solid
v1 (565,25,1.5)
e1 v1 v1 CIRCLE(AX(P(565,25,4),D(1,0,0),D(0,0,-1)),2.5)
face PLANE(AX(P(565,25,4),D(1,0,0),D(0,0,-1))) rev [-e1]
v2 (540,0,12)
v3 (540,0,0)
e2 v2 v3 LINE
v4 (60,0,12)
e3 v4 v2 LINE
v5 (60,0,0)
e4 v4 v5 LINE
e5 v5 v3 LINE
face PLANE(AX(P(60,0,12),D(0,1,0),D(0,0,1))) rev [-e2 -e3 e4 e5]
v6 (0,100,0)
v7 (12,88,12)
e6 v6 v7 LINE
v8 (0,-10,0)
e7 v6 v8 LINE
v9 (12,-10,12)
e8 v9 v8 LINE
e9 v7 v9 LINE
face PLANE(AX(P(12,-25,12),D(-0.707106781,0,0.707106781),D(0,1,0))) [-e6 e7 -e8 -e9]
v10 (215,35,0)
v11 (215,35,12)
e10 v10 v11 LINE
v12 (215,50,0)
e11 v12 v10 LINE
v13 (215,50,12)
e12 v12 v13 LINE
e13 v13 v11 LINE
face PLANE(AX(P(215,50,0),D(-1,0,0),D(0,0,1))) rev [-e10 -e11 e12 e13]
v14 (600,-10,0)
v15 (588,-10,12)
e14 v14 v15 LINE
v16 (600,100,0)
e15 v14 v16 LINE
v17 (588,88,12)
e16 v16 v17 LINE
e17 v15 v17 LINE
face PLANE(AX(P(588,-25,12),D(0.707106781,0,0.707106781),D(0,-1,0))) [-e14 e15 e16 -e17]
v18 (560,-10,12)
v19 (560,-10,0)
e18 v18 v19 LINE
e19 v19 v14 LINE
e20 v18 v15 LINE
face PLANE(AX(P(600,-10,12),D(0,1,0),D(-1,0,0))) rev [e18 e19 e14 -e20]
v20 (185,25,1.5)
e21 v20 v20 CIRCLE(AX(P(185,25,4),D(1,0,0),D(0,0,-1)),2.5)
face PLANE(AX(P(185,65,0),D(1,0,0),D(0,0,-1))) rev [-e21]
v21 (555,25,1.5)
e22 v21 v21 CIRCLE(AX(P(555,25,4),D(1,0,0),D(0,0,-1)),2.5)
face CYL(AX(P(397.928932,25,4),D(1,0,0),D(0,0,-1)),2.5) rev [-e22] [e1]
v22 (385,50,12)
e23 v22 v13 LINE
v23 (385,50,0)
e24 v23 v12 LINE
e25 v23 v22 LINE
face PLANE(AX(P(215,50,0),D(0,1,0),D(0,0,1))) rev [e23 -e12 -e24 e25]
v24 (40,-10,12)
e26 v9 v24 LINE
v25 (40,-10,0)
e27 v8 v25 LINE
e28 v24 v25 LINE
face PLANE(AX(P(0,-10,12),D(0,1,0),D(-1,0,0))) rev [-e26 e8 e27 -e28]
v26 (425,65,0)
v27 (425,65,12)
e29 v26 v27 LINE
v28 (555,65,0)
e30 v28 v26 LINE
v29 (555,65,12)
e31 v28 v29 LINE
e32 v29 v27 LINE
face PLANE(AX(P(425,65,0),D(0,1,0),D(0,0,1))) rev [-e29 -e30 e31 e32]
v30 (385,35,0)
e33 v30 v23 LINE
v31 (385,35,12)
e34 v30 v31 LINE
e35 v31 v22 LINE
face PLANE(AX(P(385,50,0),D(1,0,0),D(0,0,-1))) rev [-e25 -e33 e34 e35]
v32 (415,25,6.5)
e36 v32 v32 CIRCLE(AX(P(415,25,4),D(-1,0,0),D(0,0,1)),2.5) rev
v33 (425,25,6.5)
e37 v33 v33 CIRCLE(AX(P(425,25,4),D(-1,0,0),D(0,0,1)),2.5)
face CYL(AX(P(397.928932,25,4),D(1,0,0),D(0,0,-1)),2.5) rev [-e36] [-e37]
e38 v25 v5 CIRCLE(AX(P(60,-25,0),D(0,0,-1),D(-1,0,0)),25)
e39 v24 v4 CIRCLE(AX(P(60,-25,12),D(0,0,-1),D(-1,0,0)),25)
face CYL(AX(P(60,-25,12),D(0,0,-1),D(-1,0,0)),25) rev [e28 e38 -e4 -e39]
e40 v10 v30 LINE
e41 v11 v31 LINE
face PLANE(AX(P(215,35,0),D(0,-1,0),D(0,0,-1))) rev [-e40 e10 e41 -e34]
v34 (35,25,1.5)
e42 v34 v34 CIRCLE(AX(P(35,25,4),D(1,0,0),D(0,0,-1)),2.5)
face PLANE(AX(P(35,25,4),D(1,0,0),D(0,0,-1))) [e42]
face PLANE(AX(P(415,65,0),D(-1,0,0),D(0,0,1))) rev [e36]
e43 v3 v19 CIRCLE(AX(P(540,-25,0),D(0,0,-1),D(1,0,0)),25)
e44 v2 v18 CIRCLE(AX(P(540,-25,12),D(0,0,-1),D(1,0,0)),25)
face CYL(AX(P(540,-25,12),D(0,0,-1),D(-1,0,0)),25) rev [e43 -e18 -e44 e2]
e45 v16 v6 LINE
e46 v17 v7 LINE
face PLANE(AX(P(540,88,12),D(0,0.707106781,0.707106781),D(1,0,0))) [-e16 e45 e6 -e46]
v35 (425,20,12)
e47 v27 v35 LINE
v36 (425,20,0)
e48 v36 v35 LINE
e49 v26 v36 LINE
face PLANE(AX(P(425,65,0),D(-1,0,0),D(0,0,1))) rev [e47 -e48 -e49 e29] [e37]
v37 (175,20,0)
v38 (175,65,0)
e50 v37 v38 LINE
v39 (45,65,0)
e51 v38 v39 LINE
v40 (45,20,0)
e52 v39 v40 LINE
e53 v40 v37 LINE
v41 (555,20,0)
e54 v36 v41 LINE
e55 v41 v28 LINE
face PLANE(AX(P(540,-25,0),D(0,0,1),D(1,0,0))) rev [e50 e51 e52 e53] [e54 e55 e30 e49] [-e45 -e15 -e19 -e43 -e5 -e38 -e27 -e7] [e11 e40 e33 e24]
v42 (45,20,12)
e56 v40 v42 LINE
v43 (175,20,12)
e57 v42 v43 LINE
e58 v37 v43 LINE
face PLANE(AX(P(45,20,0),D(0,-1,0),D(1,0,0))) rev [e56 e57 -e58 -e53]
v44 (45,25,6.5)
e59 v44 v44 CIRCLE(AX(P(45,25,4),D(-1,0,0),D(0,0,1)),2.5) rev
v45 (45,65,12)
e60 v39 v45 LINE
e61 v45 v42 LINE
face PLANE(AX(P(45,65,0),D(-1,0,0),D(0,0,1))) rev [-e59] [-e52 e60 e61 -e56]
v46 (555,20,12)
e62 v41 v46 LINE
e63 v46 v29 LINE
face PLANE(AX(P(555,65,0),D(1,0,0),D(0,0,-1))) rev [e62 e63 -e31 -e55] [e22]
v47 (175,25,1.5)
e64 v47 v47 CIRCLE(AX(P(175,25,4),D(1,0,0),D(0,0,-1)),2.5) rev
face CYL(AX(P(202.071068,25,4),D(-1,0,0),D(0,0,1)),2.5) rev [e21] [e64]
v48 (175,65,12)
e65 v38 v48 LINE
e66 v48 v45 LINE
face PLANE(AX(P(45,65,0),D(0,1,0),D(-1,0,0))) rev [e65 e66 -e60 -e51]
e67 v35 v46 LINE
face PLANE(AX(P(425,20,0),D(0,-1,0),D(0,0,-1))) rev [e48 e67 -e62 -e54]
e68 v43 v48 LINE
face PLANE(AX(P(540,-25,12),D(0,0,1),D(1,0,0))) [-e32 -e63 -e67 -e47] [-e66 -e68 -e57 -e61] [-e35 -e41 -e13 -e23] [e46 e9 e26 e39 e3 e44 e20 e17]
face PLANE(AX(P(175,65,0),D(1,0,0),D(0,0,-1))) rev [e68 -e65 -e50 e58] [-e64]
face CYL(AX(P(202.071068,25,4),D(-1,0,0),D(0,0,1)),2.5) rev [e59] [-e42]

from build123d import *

# Parameters (mm, degrees)
BOSS_EXTRUDE1_DEPTH = 12
SKETCH2_W           = 130
SKETCH2_H           = 45
SKETCH2_W_2         = 170
SKETCH2_H_2         = 15
CUT_EXTRUDE1_DEPTH  = 609.394608786
CHAMFER1_SIZE       = 12
CUT_EXTRUDE2_START  = -10
SKETCH3_R           = 2.5
CUT_EXTRUDE2_DEPTH  = 150
CUT_EXTRUDE3_START  = 370
SKETCH3_2_R         = 2.5
CUT_EXTRUDE3_DEPTH  = 150


with BuildPart() as part:
    # Sketch1 → Boss-Extrude1 (new body)
    with BuildSketch(Plane.XY):
        with BuildLine():
            Line((0, 0), (0, -10))
            Line((0, -10), (40, -10))
            ThreePointArc((40, -10), (48.819660113, -2.639320225), (60, 0))
            Line((60, 0), (540, 0))
            ThreePointArc((540, 0), (551.180339887, -2.639320225), (560, -10))
            Line((560, -10), (600, -10))
            Line((600, -10), (600, 0))
            Line((600, 0), (600, 100))
            Line((600, 100), (0, 100))
            Line((0, 100), (0, 0))
        make_face()
    extrude(amount=BOSS_EXTRUDE1_DEPTH)

    # Sketch2 → Cut-Extrude1 (cut, through all)
    with BuildSketch(Plane.XY.offset(12)):
        with Locations((110, 42.5)):
            Rectangle(SKETCH2_W, SKETCH2_H)
        with Locations((300, 42.5)):
            Rectangle(SKETCH2_W_2, SKETCH2_H_2)
        with Locations((490, 42.5)):
            Rectangle(SKETCH2_W, SKETCH2_H)
    extrude(amount=-CUT_EXTRUDE1_DEPTH, mode=Mode.SUBTRACT)

    # Chamfer1
    chamfer1_edges = [part.edges().sort_by_distance(p)[0] for p in [
        (600, 45, 12),
        (300, 100, 12),
        (0, 45, 12),
    ]]
    chamfer(chamfer1_edges, length=CHAMFER1_SIZE - 0.0001)  # a hair under: the kernel refuses the full size

    # Sketch3 → Cut-Extrude2 (cut)
    with BuildSketch(Plane(origin=(45, 0, 0), x_dir=(0, 0, -1), z_dir=(1, 0, 0)).offset(CUT_EXTRUDE2_START)):
        with Locations((-4, 25)):
            Circle(SKETCH3_R)
    extrude(amount=CUT_EXTRUDE2_DEPTH, mode=Mode.SUBTRACT)

    # Sketch3<2> → Cut-Extrude3 (cut)
    with BuildSketch(Plane(origin=(45, 0, 0), x_dir=(0, 0, -1), z_dir=(1, 0, 0)).offset(CUT_EXTRUDE3_START)):
        with Locations((-4, 25)):
            Circle(SKETCH3_2_R)
    extrude(amount=CUT_EXTRUDE3_DEPTH, mode=Mode.SUBTRACT)


solid = part.part
